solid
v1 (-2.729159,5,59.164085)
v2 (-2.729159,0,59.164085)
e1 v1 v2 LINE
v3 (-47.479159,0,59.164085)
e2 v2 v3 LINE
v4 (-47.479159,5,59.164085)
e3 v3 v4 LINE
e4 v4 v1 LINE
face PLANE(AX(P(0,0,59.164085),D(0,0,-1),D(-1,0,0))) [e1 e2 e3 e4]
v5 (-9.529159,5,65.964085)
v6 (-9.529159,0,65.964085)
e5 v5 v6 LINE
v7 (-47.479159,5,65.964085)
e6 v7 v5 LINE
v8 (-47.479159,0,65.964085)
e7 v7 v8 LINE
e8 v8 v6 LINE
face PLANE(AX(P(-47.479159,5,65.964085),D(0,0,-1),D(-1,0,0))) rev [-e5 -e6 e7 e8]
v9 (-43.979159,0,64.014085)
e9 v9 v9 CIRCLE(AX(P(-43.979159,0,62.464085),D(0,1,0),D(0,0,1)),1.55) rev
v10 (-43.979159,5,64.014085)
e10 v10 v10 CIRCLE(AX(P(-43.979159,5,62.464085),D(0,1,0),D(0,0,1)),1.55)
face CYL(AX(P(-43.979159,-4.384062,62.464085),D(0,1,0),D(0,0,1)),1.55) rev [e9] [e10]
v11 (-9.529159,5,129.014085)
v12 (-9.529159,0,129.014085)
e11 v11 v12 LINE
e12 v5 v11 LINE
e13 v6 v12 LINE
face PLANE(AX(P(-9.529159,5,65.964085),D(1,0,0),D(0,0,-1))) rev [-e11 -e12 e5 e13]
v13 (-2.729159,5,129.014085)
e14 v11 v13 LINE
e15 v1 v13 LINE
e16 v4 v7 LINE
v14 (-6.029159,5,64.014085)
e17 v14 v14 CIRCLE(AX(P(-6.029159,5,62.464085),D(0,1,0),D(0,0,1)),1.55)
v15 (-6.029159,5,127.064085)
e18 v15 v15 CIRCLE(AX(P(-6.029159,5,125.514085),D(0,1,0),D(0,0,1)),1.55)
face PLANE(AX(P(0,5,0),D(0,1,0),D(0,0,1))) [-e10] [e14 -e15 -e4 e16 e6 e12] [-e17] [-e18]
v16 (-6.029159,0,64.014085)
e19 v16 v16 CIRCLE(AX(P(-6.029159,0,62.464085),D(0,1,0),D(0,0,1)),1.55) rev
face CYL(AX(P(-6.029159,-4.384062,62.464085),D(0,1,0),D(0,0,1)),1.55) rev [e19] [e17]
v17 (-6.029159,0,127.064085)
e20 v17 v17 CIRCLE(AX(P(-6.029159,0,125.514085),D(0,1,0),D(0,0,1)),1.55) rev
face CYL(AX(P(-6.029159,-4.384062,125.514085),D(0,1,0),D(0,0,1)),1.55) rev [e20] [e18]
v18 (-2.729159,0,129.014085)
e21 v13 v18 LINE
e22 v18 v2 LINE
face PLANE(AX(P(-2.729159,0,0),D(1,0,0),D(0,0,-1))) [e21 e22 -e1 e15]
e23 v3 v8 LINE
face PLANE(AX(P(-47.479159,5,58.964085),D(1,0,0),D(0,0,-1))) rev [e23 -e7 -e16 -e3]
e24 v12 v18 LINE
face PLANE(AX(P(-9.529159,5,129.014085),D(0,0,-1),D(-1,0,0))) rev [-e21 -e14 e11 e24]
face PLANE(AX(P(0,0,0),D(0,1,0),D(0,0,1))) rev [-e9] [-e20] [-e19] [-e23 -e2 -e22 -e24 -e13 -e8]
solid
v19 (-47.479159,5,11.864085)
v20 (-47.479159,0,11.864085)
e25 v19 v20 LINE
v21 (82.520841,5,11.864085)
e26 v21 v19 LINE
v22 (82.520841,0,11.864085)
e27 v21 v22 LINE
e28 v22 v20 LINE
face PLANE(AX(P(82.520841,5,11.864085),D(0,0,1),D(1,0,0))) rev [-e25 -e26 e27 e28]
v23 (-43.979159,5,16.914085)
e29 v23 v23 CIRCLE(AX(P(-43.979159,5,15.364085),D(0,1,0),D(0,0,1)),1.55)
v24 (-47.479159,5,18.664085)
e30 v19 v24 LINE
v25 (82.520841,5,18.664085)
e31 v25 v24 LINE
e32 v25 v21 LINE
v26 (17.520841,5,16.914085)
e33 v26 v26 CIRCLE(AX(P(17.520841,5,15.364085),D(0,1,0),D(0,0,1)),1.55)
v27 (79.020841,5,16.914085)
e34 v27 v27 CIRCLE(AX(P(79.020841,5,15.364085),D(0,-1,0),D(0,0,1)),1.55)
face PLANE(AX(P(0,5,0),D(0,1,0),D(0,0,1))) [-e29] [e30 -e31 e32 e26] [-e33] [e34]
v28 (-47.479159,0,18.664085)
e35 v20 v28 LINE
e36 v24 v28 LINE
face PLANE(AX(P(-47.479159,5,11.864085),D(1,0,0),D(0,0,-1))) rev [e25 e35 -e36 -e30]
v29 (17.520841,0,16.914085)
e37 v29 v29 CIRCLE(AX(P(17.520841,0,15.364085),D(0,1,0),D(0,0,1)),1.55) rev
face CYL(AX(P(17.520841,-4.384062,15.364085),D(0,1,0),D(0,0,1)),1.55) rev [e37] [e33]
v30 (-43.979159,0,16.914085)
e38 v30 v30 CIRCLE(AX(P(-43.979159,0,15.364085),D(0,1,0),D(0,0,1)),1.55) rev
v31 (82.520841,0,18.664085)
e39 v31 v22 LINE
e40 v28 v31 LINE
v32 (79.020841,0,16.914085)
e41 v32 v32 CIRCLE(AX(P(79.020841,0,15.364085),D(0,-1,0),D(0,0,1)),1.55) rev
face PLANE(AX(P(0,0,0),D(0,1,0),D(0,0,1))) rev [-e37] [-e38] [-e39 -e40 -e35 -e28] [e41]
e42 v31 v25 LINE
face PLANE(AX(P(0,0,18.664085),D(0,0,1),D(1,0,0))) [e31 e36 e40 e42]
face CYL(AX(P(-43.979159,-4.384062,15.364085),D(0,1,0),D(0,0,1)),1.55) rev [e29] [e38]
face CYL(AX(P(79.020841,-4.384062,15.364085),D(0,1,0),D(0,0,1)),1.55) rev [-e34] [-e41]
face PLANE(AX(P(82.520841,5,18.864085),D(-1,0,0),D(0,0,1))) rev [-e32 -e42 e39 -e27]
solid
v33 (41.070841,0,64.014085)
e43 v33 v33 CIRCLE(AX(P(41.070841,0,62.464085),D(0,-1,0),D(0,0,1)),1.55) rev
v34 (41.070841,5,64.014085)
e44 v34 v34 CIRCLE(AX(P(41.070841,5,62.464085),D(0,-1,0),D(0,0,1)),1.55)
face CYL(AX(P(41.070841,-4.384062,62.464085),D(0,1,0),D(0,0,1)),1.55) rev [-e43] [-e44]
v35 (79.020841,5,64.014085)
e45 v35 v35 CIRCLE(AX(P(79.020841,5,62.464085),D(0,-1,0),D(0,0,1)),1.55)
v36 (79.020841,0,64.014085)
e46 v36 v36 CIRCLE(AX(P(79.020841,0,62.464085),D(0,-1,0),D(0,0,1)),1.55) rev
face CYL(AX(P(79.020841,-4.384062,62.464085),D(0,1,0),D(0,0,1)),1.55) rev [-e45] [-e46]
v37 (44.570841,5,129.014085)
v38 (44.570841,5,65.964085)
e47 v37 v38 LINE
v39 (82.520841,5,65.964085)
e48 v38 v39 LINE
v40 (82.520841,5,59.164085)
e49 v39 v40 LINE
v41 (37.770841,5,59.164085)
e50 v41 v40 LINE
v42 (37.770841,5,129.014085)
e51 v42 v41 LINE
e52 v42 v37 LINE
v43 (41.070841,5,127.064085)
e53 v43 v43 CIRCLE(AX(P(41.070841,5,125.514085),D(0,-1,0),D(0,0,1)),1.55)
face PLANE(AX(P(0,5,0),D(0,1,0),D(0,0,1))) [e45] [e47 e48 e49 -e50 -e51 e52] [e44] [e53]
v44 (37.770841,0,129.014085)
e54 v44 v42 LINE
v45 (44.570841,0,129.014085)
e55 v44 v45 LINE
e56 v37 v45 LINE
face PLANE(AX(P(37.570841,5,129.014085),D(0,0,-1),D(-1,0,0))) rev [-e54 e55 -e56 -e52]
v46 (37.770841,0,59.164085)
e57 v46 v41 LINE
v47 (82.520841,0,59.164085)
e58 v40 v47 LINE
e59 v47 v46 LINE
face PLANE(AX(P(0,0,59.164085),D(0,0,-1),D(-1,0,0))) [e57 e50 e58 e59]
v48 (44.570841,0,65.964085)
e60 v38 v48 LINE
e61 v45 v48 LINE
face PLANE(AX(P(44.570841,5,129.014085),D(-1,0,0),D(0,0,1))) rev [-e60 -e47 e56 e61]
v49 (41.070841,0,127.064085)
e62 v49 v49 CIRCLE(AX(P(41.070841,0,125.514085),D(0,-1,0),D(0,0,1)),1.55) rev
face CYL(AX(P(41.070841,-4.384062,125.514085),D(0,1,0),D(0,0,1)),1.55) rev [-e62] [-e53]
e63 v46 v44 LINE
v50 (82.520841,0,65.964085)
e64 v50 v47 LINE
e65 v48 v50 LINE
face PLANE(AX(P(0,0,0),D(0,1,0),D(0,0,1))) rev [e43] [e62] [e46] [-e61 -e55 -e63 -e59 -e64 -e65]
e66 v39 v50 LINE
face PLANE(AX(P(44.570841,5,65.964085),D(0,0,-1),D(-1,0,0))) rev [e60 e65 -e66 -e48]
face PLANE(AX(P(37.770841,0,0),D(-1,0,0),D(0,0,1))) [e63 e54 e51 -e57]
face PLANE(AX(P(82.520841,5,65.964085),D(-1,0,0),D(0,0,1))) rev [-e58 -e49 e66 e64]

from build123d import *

# Parameters (mm, degrees)
BOSS_EXTRUDE1_DEPTH   = 5
SKETCH4_W             = 130
SKETCH4_H             = 7
BOSS_EXTRUDE1_2_DEPTH = 5
BOSS_EXTRUDE1_3_DEPTH = 5
SKETCH5_R             = 1.55
CUT_EXTRUDE1_DEPTH    = 5
MIRROR1_OUTLINE_R     = 1.55
MIRROR1_DEPTH         = 5
SKETCH6_R             = 1.55
CUT_EXTRUDE2_DEPTH    = 5
SKETCH7_W             = 130
SKETCH7_H             = 5
CUT_EXTRUDE3_DEPTH    = 0.2
SKETCH8_W             = 70.05
SKETCH8_H             = 5
CUT_EXTRUDE4_DEPTH    = 0.2
SKETCH9_W             = 44.75
SKETCH9_H             = 5
CUT_EXTRUDE5_DEPTH    = 0.2
SKETCH10_W            = 70.05
SKETCH10_H            = 5
CUT_EXTRUDE6_DEPTH    = 0.2
SKETCH11_W            = 44.75
SKETCH11_H            = 5
CUT_EXTRUDE7_DEPTH    = 0.2


# Read off the part's stored shape, not the designer's step: Mirror1
with BuildPart() as part:
    # Sketch4 → Boss-Extrude1 (new body)
    with BuildSketch(Plane(origin=(0, 0, 0), x_dir=(1, 0, 0), z_dir=(0, 1, 0))):
        Polygon((-47.47915883, -58.964084508), (-47.47915883, -65.964084508), (-9.52915883, -65.964084508), (-9.52915883, -129.014084508), (-2.52915883, -129.014084508), (-2.52915883, -58.964084508), align=None)
    extrude(amount=BOSS_EXTRUDE1_DEPTH)


with BuildPart() as body_2:
    # Sketch4 → Boss-Extrude1 2 (new body)
    with BuildSketch(Plane(origin=(0, 0, 0), x_dir=(1, 0, 0), z_dir=(0, 1, 0))):
        with Locations((17.52084117, -15.364084508)):
            Rectangle(SKETCH4_W, SKETCH4_H)
    extrude(amount=BOSS_EXTRUDE1_2_DEPTH)


with BuildPart() as body_3:
    # Sketch4 → Boss-Extrude1 3 (new body)
    with BuildSketch(Plane(origin=(0, 0, 0), x_dir=(1, 0, 0), z_dir=(0, 1, 0))):
        Polygon((37.57084117, -58.964084508), (37.57084117, -129.014084508), (44.57084117, -129.014084508), (44.57084117, -65.964084508), (82.52084117, -65.964084508), (82.52084117, -58.964084508), align=None)
    extrude(amount=BOSS_EXTRUDE1_3_DEPTH)


with BuildPart() as cut_extrude1_tool:
    # Sketch5 → Cut-Extrude1 (new body)
    with BuildSketch(Plane(origin=(0, 5, 0), x_dir=(1, 0, 0), z_dir=(0, 1, 0))):
        with Locations(Location((-6.02915883, -125.514084508, 0), (0, 0, 270))):
            Circle(SKETCH5_R)
        with Locations(Location((-6.02915883, -62.464084508, 0), (0, 0, 270))):
            Circle(SKETCH5_R)
        with Locations(Location((-43.97915883, -62.464084508, 0), (0, 0, 270))):
            Circle(SKETCH5_R)
        with Locations(Location((-43.97915883, -15.364084508, 0), (0, 0, 270))):
            Circle(SKETCH5_R)
    extrude(amount=-CUT_EXTRUDE1_DEPTH)


with BuildPart() as part_1:
    add(part.part)

    # Cut-Extrude1: cut by cut_extrude1_tool
    add(cut_extrude1_tool.part, mode=Mode.SUBTRACT)

    # Sketch8 → Cut-Extrude4 (cut)
    with BuildSketch(Plane(origin=(-2.52915883, 0, 0), x_dir=(0, 0, -1), z_dir=(1, 0, 0))):
        with Locations((-93.989084508, 2.5)):
            Rectangle(SKETCH8_W, SKETCH8_H)
    extrude(amount=-CUT_EXTRUDE4_DEPTH, mode=Mode.SUBTRACT)

    # Sketch9 → Cut-Extrude5 (cut)
    with BuildSketch(Plane(origin=(0, 0, 58.964084508), x_dir=(-1, 0, 0), z_dir=(0, 0, -1))):
        with Locations((25.10415883, 2.5)):
            Rectangle(SKETCH9_W, SKETCH9_H)
    extrude(amount=-CUT_EXTRUDE5_DEPTH, mode=Mode.SUBTRACT)


with BuildPart() as body_2_1:
    add(body_2.part)

    # Cut-Extrude1: cut by cut_extrude1_tool
    add(cut_extrude1_tool.part, mode=Mode.SUBTRACT)


with BuildPart() as mirror1_tool:
    # Mirror1 outline → Mirror1 (new body)
    with BuildSketch(Plane(origin=(0, 0, 0), x_dir=(1, 0, 0), z_dir=(0, 1, 0))):
        with Locations((41.07084117, -125.514084508)):
            Circle(MIRROR1_OUTLINE_R)
        with Locations((79.02084117, -62.464084508)):
            Circle(MIRROR1_OUTLINE_R)
        with Locations((41.07084117, -62.464084508)):
            Circle(MIRROR1_OUTLINE_R)
        with Locations((79.02084117, -15.364084508)):
            Circle(MIRROR1_OUTLINE_R)
    extrude(amount=MIRROR1_DEPTH)


with BuildPart() as body_2_2:
    add(body_2_1.part)

    # Mirror1: cut by mirror1_tool
    add(mirror1_tool.part, mode=Mode.SUBTRACT)

    # Sketch6 → Cut-Extrude2 (cut)
    with BuildSketch(Plane(origin=(0, 5, 0), x_dir=(1, 0, 0), z_dir=(0, 1, 0))):
        with Locations(Location((17.52084117, -15.364084508, 0), (0, 0, 270))):
            Circle(SKETCH6_R)
    extrude(amount=-CUT_EXTRUDE2_DEPTH, mode=Mode.SUBTRACT)

    # Sketch7 → Cut-Extrude3 (cut)
    with BuildSketch(Plane.XY.offset(18.864084508)):
        with Locations((17.52084117, 2.5)):
            Rectangle(SKETCH7_W, SKETCH7_H)
    extrude(amount=-CUT_EXTRUDE3_DEPTH, mode=Mode.SUBTRACT)


with BuildPart() as body_3_1:
    add(body_3.part)

    # Mirror1: cut by mirror1_tool
    add(mirror1_tool.part, mode=Mode.SUBTRACT)

    # Sketch10 → Cut-Extrude6 (cut)
    with BuildSketch(Plane.ZY.offset(-37.57084117)):
        with Locations((93.989084508, 2.5)):
            Rectangle(SKETCH10_W, SKETCH10_H)
    extrude(amount=-CUT_EXTRUDE6_DEPTH, mode=Mode.SUBTRACT)

    # Sketch11 → Cut-Extrude7 (cut)
    with BuildSketch(Plane(origin=(0, 0, 58.964084508), x_dir=(-1, 0, 0), z_dir=(0, 0, -1))):
        with Locations((-60.14584117, 2.5)):
            Rectangle(SKETCH11_W, SKETCH11_H)
    extrude(amount=-CUT_EXTRUDE7_DEPTH, mode=Mode.SUBTRACT)


solid = Compound([part_1.part, body_2_2.part, body_3_1.part])
